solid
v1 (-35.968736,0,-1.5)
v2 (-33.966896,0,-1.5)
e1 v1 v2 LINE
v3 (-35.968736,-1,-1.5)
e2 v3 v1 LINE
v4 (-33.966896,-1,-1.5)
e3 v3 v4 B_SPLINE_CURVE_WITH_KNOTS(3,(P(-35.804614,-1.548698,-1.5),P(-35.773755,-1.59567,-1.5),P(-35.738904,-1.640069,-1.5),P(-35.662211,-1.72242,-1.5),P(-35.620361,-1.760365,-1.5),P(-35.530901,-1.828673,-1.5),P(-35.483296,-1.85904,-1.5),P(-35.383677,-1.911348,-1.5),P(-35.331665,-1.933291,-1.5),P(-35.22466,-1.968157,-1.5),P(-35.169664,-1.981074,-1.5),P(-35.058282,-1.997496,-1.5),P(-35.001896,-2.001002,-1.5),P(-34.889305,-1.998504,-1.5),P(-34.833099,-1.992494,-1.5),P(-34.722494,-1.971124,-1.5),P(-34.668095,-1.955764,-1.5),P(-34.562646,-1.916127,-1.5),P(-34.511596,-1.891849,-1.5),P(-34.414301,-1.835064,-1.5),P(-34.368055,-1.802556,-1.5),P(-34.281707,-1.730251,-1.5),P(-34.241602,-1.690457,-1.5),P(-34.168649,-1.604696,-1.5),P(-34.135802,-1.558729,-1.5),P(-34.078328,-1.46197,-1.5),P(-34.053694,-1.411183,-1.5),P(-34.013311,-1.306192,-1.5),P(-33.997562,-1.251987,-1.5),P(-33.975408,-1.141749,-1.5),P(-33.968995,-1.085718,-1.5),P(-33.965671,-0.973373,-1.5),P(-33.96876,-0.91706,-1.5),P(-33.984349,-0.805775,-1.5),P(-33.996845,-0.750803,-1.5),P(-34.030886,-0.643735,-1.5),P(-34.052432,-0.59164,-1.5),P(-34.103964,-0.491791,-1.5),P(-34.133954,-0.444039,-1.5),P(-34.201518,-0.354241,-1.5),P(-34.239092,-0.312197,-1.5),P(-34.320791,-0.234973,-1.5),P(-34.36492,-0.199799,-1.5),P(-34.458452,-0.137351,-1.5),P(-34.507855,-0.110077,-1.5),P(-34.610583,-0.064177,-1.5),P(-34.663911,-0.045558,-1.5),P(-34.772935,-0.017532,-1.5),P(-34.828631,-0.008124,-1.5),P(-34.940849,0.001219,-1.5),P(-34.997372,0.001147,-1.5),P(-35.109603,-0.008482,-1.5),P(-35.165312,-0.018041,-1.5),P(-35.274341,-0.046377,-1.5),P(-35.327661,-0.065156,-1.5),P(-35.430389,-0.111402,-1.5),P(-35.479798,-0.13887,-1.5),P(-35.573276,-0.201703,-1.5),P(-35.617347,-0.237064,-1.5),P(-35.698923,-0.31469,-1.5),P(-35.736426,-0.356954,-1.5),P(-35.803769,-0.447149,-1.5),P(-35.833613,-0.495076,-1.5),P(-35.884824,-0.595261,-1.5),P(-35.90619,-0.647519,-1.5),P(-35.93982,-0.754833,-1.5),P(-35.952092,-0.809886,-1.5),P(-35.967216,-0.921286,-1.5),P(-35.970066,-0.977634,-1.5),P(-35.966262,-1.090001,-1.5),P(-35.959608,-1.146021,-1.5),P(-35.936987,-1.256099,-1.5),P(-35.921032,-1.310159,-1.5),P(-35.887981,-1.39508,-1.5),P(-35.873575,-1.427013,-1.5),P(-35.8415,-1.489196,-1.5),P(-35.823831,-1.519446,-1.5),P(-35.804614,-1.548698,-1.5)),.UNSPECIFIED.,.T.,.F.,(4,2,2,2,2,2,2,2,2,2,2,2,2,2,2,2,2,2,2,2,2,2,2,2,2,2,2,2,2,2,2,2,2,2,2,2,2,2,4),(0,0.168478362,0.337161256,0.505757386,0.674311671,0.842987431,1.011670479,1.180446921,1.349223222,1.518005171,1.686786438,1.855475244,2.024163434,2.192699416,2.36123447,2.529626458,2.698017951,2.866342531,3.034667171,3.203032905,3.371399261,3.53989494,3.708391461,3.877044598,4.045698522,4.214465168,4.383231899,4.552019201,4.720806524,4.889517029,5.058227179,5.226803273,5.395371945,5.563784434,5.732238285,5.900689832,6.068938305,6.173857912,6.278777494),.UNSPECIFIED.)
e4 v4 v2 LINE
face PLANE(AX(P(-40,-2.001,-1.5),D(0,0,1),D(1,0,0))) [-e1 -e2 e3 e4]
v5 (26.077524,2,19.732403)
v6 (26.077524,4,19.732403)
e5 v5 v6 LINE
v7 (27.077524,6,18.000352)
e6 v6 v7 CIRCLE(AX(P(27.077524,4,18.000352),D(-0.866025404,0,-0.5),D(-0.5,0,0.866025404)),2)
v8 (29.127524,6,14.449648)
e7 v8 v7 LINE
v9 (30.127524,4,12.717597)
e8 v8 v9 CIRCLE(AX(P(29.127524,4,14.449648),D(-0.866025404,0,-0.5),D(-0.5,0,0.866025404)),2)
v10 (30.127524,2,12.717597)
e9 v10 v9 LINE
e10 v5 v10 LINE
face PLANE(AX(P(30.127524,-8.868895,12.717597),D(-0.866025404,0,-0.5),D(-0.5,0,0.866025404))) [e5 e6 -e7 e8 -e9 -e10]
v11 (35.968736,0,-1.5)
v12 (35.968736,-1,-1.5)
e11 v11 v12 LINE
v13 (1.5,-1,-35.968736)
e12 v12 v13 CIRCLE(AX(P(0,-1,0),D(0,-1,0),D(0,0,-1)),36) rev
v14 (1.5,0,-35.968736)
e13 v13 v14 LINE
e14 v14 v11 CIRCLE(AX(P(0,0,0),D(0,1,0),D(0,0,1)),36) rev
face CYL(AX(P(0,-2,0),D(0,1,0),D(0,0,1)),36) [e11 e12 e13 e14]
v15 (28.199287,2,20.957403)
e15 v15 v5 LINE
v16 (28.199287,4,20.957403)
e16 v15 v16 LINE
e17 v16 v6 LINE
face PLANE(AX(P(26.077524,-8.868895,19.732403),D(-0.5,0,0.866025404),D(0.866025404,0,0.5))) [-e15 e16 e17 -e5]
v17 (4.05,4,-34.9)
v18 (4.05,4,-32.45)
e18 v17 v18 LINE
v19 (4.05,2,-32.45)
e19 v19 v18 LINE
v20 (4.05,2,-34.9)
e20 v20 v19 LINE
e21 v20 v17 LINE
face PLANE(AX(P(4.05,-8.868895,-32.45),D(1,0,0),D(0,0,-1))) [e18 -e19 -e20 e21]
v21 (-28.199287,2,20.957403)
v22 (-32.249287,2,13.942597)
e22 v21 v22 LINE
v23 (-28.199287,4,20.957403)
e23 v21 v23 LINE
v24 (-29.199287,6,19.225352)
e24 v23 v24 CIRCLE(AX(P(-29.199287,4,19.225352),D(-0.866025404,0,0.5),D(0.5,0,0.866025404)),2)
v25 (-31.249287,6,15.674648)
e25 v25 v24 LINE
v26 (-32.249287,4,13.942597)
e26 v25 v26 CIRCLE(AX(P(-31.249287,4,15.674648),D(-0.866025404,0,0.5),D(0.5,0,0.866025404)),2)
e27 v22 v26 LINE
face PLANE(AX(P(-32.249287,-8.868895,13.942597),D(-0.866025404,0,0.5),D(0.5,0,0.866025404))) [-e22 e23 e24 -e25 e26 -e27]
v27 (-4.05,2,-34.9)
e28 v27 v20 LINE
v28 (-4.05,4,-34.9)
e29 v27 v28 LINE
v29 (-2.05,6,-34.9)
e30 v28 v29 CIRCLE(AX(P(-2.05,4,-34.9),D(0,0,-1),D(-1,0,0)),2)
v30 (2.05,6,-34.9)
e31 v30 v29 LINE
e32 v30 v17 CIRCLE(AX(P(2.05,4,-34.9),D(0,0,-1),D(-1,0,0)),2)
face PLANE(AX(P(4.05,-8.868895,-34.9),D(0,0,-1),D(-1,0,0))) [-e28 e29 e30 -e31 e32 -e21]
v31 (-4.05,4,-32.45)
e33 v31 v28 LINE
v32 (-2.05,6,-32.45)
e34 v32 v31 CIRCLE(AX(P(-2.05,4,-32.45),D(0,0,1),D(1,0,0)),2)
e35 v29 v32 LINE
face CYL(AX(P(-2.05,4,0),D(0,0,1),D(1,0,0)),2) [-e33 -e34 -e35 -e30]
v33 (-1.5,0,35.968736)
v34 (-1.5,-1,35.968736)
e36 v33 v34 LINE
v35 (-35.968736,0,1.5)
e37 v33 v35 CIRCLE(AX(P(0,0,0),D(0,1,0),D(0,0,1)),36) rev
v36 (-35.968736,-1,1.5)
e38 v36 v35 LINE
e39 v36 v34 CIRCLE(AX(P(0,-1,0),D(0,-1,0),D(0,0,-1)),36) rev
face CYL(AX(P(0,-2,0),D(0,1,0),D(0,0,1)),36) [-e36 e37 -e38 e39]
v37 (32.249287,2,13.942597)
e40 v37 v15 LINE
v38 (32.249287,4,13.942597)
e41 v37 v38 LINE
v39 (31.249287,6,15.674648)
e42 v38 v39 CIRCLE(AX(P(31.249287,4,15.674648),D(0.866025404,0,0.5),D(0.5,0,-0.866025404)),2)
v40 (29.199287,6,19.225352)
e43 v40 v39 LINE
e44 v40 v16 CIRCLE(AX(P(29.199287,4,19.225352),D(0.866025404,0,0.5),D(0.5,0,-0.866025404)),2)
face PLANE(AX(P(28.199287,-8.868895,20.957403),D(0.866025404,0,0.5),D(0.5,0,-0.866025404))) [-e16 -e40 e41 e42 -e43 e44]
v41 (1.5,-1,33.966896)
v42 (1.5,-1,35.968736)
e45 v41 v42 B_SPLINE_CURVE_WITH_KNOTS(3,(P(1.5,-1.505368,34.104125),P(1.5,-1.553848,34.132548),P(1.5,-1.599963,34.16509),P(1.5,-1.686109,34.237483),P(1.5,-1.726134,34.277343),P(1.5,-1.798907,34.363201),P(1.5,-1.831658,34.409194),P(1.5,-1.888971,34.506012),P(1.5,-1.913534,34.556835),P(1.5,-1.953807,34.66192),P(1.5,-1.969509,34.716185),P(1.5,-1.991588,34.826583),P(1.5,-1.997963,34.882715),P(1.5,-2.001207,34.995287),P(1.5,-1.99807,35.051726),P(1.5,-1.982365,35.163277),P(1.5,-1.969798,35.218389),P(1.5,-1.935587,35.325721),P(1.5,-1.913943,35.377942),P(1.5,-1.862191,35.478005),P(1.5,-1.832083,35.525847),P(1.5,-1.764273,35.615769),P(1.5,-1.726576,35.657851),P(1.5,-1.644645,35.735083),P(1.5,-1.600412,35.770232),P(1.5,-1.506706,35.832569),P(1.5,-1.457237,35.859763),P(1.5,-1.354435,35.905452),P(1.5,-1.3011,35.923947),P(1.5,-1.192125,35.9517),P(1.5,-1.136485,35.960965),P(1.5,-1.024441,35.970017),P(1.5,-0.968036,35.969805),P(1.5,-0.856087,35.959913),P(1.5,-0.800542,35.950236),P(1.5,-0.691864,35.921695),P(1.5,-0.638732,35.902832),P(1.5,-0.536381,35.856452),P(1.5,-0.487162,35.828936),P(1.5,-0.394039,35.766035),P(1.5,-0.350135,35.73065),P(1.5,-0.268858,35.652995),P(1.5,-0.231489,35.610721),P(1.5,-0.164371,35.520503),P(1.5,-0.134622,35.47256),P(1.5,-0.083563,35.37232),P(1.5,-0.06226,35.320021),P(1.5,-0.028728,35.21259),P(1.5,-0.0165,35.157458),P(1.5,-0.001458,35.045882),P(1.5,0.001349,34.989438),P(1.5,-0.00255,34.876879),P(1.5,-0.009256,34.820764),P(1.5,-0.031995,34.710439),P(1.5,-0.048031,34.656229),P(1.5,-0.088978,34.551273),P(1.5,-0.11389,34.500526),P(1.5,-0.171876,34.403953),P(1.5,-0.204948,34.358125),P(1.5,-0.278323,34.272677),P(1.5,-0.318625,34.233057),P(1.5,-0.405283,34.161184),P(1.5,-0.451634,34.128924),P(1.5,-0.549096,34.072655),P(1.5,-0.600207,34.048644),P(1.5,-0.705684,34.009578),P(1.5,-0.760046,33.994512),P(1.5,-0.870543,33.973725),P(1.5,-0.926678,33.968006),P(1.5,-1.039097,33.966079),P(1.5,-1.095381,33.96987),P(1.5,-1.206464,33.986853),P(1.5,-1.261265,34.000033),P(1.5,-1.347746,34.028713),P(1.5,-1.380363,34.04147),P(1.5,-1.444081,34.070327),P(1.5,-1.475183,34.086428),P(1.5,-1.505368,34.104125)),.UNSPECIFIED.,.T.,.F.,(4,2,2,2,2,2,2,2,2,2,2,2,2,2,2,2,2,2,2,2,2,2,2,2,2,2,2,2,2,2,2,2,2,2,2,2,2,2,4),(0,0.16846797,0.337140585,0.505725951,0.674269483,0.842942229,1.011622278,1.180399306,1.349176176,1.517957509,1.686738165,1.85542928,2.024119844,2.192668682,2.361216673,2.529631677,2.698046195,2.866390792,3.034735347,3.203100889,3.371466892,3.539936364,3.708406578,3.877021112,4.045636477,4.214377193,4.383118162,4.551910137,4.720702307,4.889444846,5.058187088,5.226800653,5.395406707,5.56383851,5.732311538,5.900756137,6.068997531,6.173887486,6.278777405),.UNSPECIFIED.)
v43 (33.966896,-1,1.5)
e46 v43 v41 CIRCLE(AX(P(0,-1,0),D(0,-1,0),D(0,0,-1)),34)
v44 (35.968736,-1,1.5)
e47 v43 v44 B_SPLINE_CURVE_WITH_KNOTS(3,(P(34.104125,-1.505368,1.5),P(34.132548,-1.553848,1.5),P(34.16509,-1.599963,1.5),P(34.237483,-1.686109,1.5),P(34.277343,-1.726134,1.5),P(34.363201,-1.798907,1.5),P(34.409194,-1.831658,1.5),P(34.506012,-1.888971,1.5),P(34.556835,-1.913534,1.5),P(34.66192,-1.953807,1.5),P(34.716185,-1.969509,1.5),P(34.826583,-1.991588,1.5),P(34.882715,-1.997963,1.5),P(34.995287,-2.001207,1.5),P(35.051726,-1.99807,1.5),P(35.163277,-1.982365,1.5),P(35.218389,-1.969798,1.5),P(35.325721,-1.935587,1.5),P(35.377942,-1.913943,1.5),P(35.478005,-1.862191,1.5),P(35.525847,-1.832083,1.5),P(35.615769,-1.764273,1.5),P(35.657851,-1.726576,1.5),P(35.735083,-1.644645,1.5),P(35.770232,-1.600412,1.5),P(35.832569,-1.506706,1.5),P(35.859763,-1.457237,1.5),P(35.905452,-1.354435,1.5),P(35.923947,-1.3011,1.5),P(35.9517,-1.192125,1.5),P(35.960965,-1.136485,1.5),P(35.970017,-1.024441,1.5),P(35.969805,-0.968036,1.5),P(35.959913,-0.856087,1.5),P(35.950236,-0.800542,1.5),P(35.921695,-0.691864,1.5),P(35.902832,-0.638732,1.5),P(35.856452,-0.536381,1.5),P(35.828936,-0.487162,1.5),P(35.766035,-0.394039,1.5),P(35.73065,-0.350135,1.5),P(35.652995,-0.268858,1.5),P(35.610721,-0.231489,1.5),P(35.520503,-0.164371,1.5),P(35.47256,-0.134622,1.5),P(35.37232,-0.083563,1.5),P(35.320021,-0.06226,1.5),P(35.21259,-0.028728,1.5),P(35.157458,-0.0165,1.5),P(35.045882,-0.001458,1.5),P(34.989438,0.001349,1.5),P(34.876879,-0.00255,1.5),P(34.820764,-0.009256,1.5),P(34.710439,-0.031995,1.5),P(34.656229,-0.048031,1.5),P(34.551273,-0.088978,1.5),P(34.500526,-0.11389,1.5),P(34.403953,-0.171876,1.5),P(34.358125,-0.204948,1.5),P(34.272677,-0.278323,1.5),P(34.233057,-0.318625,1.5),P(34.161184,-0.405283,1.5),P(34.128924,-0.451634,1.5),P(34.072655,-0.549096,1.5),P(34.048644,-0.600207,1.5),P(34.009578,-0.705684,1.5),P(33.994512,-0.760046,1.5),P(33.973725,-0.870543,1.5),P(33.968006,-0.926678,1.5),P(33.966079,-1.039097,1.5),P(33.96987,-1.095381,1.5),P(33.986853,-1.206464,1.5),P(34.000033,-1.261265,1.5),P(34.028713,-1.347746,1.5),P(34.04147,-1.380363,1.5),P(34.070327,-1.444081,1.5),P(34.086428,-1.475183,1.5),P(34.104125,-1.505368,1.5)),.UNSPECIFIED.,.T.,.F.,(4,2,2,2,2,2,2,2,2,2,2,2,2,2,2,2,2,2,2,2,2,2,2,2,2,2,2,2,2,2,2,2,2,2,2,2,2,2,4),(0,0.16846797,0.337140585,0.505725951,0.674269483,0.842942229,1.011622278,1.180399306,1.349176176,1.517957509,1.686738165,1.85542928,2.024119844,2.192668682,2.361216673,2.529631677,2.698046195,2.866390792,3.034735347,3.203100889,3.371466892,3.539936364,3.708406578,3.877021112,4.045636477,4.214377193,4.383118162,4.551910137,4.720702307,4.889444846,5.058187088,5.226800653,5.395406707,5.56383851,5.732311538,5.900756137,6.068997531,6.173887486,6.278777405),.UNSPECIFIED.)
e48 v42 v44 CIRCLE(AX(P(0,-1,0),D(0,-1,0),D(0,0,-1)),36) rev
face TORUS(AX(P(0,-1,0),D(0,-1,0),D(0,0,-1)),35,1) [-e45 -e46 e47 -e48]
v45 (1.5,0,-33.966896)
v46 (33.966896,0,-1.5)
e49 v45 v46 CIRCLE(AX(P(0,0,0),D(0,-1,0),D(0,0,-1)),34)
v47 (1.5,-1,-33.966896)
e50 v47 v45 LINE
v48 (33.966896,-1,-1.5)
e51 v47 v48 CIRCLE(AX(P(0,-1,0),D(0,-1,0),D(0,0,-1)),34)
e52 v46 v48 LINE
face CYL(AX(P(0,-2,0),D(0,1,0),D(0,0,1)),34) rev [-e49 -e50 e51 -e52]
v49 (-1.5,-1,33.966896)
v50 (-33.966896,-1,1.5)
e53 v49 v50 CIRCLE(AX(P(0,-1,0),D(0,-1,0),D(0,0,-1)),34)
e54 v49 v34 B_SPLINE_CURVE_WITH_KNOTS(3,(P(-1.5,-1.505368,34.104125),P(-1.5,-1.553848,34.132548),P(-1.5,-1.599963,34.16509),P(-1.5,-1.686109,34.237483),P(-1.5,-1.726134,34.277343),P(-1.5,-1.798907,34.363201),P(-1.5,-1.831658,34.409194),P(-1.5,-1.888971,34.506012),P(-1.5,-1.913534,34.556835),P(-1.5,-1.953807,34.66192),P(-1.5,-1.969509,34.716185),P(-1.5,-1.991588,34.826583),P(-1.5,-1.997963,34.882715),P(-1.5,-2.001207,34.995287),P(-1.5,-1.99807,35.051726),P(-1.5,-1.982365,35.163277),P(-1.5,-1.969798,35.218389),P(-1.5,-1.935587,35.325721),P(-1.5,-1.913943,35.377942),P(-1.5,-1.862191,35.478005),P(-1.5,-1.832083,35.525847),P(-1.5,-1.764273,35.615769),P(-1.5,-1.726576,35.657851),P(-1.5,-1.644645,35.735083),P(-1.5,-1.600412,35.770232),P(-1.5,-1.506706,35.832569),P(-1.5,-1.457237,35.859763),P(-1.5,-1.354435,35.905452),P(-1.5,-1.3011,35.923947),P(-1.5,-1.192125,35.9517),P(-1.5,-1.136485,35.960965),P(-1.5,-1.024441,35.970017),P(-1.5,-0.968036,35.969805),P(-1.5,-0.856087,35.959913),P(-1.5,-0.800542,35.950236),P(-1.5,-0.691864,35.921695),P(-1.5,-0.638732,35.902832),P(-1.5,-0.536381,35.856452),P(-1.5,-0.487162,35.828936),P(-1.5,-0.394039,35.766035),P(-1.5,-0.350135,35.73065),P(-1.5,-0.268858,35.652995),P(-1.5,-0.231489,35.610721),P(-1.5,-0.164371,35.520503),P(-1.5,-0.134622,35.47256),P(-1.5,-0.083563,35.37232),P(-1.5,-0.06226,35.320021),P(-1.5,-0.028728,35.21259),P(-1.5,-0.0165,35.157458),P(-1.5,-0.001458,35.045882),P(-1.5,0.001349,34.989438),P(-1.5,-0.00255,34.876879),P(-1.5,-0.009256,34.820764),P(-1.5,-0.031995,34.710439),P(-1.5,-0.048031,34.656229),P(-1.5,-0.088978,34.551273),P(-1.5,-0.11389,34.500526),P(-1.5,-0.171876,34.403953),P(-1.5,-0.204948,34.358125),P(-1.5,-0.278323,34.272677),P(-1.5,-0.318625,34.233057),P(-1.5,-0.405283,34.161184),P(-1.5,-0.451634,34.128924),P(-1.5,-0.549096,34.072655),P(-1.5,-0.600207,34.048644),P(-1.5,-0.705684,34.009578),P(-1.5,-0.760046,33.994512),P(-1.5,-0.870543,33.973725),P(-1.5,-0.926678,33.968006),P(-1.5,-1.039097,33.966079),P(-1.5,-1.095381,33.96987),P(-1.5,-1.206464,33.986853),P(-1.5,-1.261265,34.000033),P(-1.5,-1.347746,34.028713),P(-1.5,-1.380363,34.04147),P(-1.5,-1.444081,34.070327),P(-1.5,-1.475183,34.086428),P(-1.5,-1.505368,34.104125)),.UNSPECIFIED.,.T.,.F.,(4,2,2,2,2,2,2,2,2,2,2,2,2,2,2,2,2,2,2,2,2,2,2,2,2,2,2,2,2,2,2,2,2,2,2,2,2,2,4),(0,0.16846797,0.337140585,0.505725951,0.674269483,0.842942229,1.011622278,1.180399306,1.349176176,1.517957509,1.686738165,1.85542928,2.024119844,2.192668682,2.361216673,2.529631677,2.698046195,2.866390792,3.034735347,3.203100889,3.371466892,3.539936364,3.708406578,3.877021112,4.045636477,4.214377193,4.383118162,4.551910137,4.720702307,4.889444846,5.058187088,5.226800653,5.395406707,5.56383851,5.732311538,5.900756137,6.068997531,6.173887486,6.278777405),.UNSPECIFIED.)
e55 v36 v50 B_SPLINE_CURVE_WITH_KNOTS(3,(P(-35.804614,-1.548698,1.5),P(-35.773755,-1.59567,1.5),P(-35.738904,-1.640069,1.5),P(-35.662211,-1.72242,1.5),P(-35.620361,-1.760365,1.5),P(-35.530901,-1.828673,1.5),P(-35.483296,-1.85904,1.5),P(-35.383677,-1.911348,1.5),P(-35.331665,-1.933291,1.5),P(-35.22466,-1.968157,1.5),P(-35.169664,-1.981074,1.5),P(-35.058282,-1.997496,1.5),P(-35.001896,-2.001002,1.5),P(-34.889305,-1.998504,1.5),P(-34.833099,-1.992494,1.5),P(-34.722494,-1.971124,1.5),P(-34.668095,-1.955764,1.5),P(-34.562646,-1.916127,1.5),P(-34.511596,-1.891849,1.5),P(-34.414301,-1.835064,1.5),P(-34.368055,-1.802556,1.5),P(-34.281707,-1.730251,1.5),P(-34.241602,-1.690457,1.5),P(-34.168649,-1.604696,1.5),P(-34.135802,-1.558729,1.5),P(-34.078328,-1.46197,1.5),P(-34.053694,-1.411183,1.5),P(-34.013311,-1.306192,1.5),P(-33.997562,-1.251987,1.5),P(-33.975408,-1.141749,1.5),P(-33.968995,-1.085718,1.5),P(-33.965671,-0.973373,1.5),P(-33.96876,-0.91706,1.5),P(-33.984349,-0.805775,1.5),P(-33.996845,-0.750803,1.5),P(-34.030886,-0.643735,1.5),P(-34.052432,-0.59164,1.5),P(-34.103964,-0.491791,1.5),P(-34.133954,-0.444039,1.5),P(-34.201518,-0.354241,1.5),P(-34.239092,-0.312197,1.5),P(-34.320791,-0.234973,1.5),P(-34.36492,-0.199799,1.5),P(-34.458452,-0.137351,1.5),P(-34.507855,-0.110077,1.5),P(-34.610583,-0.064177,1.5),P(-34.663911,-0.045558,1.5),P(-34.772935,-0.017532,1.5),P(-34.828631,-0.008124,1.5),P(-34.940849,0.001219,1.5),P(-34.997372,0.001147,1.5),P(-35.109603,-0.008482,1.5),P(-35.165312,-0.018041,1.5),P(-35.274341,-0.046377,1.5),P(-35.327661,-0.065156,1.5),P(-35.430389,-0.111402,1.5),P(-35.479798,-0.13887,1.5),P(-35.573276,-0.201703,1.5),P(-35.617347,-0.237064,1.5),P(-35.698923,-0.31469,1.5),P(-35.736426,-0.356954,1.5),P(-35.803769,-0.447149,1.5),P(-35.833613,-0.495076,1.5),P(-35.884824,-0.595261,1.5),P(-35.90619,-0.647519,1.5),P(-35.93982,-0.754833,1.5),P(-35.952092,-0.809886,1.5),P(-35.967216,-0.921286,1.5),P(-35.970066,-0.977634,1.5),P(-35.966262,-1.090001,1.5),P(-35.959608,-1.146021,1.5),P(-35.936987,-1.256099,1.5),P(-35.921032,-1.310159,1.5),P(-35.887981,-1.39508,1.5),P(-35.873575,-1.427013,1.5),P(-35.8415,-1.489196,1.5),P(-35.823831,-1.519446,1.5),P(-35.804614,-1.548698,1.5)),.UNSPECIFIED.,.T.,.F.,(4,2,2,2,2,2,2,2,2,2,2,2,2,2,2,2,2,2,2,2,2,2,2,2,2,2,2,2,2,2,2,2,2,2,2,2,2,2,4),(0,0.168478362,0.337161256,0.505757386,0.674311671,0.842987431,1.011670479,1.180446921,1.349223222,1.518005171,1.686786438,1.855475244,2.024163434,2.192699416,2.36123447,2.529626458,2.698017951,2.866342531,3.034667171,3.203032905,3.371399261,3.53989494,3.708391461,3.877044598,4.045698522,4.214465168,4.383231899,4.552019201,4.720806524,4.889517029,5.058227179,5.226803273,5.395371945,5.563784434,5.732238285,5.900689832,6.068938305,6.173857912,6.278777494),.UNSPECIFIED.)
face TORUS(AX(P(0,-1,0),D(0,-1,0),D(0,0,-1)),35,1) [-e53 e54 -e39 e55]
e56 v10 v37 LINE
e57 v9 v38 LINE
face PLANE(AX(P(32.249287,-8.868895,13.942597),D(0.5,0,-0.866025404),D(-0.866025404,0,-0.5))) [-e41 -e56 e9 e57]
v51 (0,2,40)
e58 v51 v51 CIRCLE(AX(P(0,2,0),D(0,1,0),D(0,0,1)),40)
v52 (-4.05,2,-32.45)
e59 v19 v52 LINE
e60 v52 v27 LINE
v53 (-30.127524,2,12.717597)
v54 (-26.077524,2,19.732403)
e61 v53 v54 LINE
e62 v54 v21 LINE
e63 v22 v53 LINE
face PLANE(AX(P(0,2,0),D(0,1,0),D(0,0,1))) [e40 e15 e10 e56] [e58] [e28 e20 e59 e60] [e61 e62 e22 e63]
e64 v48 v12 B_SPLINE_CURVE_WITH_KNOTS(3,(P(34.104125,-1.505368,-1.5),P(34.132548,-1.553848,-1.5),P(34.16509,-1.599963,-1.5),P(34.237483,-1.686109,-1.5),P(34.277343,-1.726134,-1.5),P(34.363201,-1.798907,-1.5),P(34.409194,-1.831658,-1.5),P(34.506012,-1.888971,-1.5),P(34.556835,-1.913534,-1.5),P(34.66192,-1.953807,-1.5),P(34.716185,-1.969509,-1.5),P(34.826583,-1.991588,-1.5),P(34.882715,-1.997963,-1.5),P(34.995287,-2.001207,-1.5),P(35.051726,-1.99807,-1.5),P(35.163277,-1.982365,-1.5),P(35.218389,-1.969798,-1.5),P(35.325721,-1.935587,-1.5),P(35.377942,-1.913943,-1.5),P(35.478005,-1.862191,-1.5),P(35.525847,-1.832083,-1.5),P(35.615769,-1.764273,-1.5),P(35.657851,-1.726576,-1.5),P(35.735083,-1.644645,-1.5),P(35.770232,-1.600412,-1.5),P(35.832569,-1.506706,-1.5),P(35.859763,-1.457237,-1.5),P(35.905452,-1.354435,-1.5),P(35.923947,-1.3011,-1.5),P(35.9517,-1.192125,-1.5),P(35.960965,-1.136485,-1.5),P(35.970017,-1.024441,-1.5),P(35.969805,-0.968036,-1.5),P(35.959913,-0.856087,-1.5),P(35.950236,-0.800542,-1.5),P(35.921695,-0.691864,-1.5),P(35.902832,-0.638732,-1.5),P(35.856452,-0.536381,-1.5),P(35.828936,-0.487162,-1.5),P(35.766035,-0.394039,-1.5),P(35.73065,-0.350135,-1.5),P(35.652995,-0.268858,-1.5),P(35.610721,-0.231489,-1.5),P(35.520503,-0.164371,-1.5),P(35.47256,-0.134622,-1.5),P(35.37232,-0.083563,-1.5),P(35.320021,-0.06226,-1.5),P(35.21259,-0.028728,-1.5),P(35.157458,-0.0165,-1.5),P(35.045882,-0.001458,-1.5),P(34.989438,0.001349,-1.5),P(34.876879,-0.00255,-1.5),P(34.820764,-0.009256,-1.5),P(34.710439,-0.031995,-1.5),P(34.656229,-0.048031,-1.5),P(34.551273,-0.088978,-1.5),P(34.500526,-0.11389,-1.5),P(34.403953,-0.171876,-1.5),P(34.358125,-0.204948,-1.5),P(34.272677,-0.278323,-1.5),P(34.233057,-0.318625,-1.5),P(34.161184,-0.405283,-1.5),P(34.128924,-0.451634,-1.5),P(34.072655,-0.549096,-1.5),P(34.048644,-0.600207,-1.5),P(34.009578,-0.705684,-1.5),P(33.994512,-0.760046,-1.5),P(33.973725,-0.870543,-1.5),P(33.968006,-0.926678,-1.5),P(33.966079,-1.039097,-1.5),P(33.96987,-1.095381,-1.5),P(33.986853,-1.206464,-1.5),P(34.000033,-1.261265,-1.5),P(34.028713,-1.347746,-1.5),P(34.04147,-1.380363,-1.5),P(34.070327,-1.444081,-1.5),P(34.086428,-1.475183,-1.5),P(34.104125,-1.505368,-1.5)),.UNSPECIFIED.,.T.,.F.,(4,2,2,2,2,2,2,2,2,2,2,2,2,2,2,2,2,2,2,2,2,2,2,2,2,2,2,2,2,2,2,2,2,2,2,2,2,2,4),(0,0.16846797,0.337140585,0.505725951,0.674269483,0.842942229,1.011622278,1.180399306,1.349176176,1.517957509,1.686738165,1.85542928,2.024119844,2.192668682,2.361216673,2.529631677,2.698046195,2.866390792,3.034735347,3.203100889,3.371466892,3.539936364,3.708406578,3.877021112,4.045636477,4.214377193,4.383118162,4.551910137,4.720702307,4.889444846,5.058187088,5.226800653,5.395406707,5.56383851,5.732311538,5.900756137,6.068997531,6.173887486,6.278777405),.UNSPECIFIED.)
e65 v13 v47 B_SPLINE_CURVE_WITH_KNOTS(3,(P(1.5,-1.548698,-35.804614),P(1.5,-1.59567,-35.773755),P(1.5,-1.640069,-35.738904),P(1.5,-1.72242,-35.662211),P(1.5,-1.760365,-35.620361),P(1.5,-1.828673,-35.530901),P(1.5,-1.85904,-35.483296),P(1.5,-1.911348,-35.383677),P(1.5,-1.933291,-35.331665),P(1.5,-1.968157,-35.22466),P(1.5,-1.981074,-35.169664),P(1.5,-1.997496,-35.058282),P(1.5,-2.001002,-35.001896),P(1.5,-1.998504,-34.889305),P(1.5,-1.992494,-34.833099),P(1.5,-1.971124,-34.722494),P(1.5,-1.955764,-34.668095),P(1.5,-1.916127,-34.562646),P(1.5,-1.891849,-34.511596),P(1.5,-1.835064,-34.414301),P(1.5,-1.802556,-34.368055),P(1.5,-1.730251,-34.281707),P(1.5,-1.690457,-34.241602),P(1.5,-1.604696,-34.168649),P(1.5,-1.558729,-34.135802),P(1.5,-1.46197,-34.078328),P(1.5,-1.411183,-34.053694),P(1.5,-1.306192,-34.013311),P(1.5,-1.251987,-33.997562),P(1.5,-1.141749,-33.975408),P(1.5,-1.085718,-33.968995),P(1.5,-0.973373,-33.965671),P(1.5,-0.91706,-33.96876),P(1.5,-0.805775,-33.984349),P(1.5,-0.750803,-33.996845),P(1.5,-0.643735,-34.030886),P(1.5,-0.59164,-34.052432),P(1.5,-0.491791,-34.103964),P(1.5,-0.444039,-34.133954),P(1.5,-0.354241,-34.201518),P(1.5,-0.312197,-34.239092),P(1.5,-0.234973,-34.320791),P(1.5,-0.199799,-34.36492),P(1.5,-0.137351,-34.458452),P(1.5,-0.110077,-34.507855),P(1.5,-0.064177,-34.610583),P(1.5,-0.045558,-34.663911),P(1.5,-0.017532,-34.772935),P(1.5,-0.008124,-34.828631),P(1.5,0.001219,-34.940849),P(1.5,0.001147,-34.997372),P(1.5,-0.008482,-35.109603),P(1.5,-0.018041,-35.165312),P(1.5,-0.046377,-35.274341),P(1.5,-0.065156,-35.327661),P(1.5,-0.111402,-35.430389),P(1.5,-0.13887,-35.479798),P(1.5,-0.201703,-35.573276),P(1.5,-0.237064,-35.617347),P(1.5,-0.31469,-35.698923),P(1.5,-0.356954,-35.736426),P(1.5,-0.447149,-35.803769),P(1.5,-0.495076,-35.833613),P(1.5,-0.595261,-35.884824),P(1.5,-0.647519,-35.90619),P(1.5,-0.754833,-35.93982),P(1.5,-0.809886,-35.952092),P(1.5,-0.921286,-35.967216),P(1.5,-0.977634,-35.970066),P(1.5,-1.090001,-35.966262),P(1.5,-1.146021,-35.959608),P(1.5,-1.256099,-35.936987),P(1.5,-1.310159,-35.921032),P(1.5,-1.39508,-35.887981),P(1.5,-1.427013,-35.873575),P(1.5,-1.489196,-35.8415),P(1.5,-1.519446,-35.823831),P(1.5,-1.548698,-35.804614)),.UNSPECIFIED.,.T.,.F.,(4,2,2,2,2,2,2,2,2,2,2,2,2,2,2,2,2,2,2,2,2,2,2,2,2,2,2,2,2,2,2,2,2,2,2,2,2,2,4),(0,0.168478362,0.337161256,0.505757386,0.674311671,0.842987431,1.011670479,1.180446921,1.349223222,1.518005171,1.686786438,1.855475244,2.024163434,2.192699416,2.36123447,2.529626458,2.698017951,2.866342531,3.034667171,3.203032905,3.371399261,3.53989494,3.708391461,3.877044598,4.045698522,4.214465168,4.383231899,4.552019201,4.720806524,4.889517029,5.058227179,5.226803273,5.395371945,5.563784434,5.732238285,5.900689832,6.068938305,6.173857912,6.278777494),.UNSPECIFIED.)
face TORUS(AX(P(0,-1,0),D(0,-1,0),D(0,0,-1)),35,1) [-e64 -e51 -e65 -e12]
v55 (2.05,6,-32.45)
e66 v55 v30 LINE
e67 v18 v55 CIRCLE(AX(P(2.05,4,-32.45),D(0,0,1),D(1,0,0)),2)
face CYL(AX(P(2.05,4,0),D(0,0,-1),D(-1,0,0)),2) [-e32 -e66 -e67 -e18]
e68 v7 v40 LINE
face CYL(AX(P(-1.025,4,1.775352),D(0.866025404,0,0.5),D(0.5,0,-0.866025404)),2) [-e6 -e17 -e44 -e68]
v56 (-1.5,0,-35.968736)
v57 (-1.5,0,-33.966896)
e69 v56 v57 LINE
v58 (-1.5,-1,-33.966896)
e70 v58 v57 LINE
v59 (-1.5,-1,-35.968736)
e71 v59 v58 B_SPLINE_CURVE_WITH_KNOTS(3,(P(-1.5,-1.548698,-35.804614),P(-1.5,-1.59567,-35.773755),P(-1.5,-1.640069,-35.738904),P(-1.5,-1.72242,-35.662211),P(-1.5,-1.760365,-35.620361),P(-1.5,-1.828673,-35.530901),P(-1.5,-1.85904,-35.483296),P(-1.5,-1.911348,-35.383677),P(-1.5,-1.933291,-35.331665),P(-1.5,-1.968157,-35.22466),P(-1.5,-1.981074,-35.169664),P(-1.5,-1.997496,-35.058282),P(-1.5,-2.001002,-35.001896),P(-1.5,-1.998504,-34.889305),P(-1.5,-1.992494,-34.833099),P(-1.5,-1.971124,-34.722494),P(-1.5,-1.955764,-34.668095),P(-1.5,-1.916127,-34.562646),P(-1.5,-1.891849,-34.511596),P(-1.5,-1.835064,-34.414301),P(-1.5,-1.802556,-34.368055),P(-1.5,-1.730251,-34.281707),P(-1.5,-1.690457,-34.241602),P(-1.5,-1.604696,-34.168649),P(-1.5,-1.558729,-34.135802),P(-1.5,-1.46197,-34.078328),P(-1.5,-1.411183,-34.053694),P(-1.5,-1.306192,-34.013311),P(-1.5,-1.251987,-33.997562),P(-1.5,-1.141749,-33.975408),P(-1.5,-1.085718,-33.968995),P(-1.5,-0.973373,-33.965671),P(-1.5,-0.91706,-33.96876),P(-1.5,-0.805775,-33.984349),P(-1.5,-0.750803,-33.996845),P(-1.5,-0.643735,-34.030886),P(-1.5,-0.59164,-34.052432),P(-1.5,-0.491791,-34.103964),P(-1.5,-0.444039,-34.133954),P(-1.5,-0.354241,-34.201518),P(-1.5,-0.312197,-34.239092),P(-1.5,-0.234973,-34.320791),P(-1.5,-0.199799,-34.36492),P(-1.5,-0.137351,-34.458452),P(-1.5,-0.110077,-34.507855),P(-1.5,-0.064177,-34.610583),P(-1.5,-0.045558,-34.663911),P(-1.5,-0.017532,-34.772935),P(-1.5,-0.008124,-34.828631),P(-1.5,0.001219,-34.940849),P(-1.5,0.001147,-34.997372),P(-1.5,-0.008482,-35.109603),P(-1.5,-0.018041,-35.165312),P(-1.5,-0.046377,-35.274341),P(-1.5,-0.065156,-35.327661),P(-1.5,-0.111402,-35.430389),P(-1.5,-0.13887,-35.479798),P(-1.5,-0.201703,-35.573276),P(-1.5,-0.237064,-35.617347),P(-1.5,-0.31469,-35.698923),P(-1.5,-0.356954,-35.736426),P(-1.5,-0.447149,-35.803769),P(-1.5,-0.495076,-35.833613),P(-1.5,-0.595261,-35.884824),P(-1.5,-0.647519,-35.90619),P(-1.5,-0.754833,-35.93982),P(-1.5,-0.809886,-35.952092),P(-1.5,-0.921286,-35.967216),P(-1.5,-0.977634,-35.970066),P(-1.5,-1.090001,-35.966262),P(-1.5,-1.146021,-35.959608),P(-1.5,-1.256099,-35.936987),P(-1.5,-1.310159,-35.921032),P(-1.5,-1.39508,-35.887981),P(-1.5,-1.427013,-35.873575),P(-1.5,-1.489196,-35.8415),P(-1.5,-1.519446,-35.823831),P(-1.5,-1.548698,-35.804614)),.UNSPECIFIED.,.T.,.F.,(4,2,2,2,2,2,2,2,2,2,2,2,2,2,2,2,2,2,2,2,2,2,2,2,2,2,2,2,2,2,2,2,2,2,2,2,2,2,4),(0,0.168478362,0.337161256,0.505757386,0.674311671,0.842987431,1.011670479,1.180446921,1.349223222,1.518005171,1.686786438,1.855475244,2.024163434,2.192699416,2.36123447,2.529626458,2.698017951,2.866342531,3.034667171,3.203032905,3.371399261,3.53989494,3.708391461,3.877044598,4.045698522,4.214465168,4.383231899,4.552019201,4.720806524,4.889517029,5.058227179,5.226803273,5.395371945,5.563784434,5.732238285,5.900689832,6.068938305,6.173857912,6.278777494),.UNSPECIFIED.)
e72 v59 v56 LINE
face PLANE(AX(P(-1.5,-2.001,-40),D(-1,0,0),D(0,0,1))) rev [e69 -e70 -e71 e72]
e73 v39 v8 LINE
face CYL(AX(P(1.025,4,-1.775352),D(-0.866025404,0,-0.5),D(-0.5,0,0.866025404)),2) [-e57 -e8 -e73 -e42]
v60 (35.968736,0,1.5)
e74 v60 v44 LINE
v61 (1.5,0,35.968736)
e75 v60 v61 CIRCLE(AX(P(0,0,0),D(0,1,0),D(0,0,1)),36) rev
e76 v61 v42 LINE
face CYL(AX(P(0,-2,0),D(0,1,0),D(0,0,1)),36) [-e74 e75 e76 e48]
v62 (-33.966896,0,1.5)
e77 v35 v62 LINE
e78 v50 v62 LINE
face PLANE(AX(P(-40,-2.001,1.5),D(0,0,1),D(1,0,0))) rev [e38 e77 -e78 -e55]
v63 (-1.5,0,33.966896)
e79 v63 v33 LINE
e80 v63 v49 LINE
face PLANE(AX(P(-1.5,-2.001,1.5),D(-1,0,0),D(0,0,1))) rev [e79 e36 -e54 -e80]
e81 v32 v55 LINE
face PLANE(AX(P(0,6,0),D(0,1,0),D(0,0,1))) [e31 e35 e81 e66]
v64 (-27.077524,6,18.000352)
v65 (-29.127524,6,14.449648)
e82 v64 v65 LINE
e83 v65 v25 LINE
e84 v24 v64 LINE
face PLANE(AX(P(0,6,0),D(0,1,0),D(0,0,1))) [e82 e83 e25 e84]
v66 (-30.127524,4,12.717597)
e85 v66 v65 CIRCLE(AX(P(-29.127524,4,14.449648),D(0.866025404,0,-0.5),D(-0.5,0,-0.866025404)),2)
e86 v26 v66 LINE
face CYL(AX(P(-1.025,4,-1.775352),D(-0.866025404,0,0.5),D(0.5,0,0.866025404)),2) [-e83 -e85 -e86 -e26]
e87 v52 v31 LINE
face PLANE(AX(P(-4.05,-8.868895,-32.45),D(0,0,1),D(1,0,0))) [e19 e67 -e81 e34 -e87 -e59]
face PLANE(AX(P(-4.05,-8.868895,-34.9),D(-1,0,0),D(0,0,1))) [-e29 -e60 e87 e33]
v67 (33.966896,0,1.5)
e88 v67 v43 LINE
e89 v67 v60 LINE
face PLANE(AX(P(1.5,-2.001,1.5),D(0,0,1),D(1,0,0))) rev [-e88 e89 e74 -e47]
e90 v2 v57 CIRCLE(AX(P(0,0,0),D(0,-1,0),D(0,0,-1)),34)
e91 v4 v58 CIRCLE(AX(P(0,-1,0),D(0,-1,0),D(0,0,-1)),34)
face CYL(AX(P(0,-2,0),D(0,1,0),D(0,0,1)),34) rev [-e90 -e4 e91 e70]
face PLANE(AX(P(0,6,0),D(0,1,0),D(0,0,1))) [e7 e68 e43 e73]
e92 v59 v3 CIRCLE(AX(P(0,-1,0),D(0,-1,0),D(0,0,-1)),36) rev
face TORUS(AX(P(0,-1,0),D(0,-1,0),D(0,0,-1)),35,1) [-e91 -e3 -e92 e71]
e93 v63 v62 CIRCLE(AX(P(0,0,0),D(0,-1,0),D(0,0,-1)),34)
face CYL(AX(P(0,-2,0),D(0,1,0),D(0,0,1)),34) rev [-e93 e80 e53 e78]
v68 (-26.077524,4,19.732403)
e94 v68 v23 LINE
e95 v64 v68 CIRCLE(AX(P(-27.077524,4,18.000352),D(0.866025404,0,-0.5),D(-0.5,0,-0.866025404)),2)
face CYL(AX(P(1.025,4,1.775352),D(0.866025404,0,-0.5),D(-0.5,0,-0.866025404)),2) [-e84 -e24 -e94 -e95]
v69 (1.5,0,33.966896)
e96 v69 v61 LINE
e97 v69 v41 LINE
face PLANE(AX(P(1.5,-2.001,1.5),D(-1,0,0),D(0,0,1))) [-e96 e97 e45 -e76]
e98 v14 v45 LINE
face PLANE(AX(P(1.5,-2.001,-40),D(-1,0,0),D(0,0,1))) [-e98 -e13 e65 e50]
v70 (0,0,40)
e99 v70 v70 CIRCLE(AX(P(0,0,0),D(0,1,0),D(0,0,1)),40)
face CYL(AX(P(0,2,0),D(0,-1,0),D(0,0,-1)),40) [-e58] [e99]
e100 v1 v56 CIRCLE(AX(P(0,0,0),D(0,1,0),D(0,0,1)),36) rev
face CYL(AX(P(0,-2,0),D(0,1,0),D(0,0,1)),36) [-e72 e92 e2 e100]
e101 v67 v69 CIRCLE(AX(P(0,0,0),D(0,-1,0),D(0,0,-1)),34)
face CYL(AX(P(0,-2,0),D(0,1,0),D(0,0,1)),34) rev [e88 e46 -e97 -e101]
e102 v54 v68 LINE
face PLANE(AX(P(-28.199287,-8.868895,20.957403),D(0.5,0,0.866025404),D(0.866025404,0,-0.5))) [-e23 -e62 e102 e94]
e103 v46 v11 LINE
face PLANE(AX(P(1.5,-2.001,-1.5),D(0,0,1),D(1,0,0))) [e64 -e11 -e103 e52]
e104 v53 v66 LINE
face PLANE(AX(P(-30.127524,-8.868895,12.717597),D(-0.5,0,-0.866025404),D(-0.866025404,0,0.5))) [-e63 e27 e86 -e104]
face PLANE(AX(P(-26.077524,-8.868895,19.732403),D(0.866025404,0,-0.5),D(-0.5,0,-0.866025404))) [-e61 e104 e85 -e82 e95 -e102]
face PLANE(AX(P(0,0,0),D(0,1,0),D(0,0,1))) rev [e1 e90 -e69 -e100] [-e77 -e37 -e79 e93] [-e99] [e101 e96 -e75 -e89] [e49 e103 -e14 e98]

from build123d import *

# Parameters (mm, degrees)
SKETCH1_R           = 40
BOSS_EXTRUDE1_DEPTH = 2
SKETCH2_W           = 8.4
SKETCH2_H           = 2.75
BOSS_EXTRUDE2_DEPTH = 4
SKETCH3_R           = 36
SKETCH3_R_2         = 34
BOSS_EXTRUDE3_DEPTH = 2
FILLET2_R           = 1
CUT_EXTRUDE1_DEPTH  = 2
SKETCH5_W           = 8.4
SKETCH5_H           = 2.75
SKETCH5_W_2         = 8.1
SKETCH5_H_2         = 2.45
CUT_EXTRUDE2_DEPTH  = 4
FILLET3_R           = 2


with BuildPart() as part:
    # Sketch1 → Boss-Extrude1 (new body)
    with BuildSketch(Plane(origin=(0, 0, 0), x_dir=(1, 0, 0), z_dir=(0, 1, 0))):
        with Locations(Location((0, 0, 0), (0, 0, 270))):
            Circle(SKETCH1_R)
    extrude(amount=BOSS_EXTRUDE1_DEPTH)

    # Sketch2 → Boss-Extrude2 (add)
    with BuildSketch(Plane(origin=(0, 2, 0), x_dir=(1, 0, 0), z_dir=(0, 1, 0))):
        with Locations((0, 33.675)):
            Rectangle(SKETCH2_W, SKETCH2_H)
        Polygon((32.454190403, -13.887693304), (28.254190403, -21.162306696), (25.872620542, -19.787306696), (30.072620542, -12.512693304), align=None)
        Polygon((-28.254190403, -21.162306696), (-32.454190403, -13.887693304), (-30.072620542, -12.512693304), (-25.872620542, -19.787306696), align=None)
    extrude(amount=BOSS_EXTRUDE2_DEPTH)

    # Sketch3 → Boss-Extrude3 (add)
    with BuildSketch(Plane.XZ):
        with Locations(Location((0, 0, 0), (0, 0, 90))):
            Circle(SKETCH3_R)
        with Locations(Location((0, 0, 0), (0, 0, 270))):
            Circle(SKETCH3_R_2, mode=Mode.SUBTRACT)
    extrude(amount=BOSS_EXTRUDE3_DEPTH)

    # Fillet2
    fillet2_edges = [part.edges().sort_by_distance(p)[0] for p in [
        (0, -2, -36),
        (0, -2, 34),
    ]]
    fillet(fillet2_edges, radius=FILLET2_R - 0.0001)  # a hair under: the kernel refuses the full size

    # Sketch4 → Cut-Extrude1 (cut)
    with BuildSketch(Plane.XZ):
        Polygon((-1.5, -40), (-1.5, -1.5), (-40, -1.5), (-40, 1.5), (-1.5, 1.5), (-1.5, 40), (1.5, 40), (1.5, 1.5), (40, 1.5), (40, -1.5), (1.5, -1.5), (1.5, -40), align=None)
    extrude(amount=CUT_EXTRUDE1_DEPTH, mode=Mode.SUBTRACT)

    # Sketch5 → Cut-Extrude2 (cut)
    # profile 1 of 3: a face of its own
    with BuildSketch(Plane(origin=(0, 6, 0), x_dir=(1, 0, 0), z_dir=(0, 1, 0))):
        Polygon((32.454190403, -13.887693304), (30.072620542, -12.512693304), (25.872620542, -19.787306696), (28.254190403, -21.162306696), align=None)
        Polygon((32.249286592, -13.942597115), (30.127524353, -12.717597115), (26.077524353, -19.732402885), (28.199286592, -20.957402885), align=None, mode=Mode.SUBTRACT)
    # profile 2 of 3: a face of its own
    with BuildSketch(Plane(origin=(0, 6, 0), x_dir=(1, 0, 0), z_dir=(0, 1, 0))):
        Polygon((-28.254190403, -21.162306696), (-25.872620542, -19.787306696), (-30.072620542, -12.512693304), (-32.454190403, -13.887693304), align=None)
        Polygon((-28.199286592, -20.957402885), (-26.077524353, -19.732402885), (-30.127524353, -12.717597115), (-32.249286592, -13.942597115), align=None, mode=Mode.SUBTRACT)
    # profile 3 of 3: a face of its own
    with BuildSketch(Plane(origin=(0, 6, 0), x_dir=(1, 0, 0), z_dir=(0, 1, 0))):
        with Locations((0, 33.675)):
            Rectangle(SKETCH5_W, SKETCH5_H)
        with Locations((0, 33.675)):
            Rectangle(SKETCH5_W_2, SKETCH5_H_2, mode=Mode.SUBTRACT)
    extrude(amount=-CUT_EXTRUDE2_DEPTH, mode=Mode.SUBTRACT)

    # Fillet3
    fillet3_edges = [part.edges().sort_by_distance(p)[0] for p in [
        (31.188405472, 6, 13.330097115),
        (27.138405472, 6, 20.344902885),
        (-27.138405472, 6, 20.344902885),
        (-31.188405472, 6, 13.330097115),
        (-4.05, 6, -33.675),
        (4.05, 6, -33.675),
    ]]
    fillet(fillet3_edges, radius=FILLET3_R)


solid = part.part
